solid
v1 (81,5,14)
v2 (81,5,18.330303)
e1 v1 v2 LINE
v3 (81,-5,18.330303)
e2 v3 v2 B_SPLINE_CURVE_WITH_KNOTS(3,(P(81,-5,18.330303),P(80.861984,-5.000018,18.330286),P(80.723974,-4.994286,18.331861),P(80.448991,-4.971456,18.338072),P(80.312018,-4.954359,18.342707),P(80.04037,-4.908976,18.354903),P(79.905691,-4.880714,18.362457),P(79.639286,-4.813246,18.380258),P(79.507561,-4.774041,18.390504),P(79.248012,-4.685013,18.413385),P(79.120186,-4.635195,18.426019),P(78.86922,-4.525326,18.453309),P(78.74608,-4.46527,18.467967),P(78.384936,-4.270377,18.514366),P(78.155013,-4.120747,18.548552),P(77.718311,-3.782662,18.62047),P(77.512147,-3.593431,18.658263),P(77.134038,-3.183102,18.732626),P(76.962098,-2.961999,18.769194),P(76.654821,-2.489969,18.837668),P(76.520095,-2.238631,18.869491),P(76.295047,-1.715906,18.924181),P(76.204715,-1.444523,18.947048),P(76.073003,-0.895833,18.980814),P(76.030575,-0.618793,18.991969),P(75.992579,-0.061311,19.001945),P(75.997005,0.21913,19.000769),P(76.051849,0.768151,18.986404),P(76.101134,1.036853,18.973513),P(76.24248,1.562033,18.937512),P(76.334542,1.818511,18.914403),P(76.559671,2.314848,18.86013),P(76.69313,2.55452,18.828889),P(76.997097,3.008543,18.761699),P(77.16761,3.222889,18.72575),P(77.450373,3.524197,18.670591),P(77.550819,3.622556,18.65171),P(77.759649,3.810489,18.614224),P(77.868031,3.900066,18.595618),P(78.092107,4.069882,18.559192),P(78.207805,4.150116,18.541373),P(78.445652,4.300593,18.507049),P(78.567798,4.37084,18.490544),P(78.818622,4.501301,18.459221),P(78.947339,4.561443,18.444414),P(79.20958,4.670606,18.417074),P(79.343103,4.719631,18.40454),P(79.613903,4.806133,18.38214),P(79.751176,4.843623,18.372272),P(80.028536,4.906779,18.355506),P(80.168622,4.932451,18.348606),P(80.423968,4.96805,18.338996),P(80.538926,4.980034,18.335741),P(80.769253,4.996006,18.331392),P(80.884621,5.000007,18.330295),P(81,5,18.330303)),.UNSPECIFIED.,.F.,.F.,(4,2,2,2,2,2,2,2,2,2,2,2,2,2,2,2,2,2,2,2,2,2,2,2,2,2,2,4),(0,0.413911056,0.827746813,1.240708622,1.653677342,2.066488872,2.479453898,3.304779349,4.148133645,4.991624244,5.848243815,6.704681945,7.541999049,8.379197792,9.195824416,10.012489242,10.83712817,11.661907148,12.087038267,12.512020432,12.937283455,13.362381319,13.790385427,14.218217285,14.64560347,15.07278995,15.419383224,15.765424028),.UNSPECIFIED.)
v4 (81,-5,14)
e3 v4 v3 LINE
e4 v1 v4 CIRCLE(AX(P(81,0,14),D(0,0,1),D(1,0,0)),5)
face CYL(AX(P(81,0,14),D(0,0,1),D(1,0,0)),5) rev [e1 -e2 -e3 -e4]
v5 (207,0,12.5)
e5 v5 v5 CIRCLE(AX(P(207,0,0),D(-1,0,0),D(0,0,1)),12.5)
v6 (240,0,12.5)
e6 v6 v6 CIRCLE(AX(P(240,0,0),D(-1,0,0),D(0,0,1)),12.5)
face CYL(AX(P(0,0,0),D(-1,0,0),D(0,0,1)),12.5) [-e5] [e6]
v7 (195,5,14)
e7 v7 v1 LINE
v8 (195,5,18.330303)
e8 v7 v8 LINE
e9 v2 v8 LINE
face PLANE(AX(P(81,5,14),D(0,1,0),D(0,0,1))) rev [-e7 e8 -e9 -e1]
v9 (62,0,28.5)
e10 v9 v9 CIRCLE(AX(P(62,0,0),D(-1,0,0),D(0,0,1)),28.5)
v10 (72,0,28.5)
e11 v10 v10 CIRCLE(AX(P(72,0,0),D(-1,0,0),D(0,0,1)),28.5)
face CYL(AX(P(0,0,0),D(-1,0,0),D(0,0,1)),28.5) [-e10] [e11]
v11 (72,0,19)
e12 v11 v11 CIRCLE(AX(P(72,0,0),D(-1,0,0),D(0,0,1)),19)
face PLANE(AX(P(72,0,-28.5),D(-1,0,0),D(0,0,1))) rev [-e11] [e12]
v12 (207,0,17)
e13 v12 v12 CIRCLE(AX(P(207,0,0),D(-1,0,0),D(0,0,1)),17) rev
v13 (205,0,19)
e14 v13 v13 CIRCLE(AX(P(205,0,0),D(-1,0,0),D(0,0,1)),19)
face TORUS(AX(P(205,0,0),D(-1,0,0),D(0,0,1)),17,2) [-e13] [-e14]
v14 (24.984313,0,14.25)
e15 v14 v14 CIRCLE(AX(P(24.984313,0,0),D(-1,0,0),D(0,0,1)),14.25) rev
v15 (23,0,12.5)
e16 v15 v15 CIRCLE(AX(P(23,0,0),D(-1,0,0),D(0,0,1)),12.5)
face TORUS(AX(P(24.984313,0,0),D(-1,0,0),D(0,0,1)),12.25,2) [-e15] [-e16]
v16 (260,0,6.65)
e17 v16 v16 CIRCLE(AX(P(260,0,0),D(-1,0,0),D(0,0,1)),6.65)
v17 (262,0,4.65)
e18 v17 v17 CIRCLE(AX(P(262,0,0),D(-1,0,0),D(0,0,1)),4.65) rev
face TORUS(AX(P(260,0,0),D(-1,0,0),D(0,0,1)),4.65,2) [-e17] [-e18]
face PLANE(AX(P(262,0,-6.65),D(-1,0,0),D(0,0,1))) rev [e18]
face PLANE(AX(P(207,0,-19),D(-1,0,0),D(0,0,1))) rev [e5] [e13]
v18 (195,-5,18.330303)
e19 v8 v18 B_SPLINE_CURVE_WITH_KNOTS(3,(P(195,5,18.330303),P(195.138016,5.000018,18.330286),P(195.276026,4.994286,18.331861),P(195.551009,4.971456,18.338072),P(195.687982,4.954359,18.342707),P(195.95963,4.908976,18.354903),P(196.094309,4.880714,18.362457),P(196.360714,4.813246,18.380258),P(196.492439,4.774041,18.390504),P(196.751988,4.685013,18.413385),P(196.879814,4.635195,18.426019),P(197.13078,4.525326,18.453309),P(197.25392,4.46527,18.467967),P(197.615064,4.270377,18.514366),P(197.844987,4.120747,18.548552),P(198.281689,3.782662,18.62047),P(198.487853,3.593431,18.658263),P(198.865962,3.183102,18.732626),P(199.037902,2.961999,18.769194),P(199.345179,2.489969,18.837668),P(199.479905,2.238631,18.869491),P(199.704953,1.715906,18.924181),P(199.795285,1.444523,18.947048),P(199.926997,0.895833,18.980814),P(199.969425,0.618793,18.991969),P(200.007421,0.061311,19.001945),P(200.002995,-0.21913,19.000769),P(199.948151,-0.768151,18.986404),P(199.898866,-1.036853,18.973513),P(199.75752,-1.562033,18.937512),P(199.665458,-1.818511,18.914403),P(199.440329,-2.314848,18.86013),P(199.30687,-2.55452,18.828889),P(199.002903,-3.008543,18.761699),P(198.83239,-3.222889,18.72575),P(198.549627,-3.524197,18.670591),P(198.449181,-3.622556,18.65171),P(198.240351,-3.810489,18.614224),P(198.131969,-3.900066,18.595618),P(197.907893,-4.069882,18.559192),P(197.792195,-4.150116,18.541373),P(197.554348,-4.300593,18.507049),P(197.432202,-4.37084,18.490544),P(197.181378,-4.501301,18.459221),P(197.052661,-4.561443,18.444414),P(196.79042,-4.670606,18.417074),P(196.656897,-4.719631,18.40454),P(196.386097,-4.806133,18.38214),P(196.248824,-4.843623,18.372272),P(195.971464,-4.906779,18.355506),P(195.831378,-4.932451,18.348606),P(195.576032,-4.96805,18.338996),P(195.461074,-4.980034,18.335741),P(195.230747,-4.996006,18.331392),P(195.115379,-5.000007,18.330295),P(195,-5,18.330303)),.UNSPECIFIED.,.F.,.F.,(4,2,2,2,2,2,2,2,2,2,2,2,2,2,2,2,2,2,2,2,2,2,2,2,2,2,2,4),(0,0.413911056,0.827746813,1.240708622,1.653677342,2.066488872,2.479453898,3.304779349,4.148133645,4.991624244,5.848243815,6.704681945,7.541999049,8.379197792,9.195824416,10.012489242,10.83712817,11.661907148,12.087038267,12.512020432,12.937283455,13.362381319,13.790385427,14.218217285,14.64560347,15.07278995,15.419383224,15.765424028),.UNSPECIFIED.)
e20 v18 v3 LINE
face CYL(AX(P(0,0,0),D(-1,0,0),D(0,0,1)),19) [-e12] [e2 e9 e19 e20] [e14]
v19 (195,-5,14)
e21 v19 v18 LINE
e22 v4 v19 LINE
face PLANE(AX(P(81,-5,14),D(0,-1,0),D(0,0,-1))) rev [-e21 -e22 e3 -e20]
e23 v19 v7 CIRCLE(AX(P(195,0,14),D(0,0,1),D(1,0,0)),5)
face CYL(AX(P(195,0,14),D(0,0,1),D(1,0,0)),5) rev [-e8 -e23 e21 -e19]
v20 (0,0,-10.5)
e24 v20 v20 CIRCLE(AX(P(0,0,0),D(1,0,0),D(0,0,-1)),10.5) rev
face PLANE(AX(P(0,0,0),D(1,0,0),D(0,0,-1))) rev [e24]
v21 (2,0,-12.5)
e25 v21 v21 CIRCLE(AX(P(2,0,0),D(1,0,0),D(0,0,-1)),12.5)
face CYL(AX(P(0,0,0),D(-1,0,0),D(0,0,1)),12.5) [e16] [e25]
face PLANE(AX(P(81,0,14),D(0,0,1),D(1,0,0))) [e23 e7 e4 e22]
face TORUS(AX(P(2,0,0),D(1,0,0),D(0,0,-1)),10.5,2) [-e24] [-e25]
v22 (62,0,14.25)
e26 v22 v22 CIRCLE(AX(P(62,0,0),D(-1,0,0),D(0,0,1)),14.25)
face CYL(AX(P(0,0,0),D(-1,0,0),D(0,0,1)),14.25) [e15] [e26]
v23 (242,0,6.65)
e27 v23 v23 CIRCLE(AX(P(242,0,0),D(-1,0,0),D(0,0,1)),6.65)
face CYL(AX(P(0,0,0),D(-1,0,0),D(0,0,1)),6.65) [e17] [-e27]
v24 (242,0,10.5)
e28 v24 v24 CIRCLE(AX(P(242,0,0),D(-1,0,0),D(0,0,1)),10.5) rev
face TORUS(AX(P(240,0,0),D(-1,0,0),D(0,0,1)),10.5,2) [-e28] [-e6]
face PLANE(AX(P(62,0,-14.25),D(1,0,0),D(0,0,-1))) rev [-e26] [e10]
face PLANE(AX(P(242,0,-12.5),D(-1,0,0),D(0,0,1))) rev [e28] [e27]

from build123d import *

# Parameters (mm, degrees)
FILLET_1_R          = 2
CUT_EXTRUDE_1_DEPTH = 5


with BuildPart() as part:
    # Эскиз1 → Повернуть1 (revolve)
    with BuildSketch(Plane(origin=(0, 0, 0), x_dir=(1, 0, 0), z_dir=(0, 1, 0)), mode=Mode.PRIVATE) as revolve_1_sk:
        Polygon((0, 0), (0, 12.5), (23, 12.5), (23, 14.25), (62, 14.25), (62, 28.5), (72, 28.5), (72, 19), (207, 19), (207, 12.5), (242, 12.5), (242, 6.65), (262, 6.65), (262, 0), align=None)
    revolve(revolve_1_sk.sketch.rotate(Axis((0, 0, 0), (1, 0, 0)), 180), axis=Axis((0, 0, 0), (1, 0, 0)))

    # Скругление1
    # the kernel refuses this fillet: 2 mm, written as the material it takes off along each edge
    with BuildSketch(Plane(origin=(262, 0, 0), x_dir=(0, 0, 1), z_dir=(0, 1, 0))) as fillet_1_piece_1:
        with BuildLine():
            CenterArc((6.65 - FILLET_1_R, -FILLET_1_R), FILLET_1_R, 0, 90)
            Line((6.65 - FILLET_1_R, 0), (6.65 - FILLET_1_R, FILLET_1_R * 0.02))
            Line((6.65 - FILLET_1_R, FILLET_1_R * 0.02), (6.65 + FILLET_1_R * 0.02, FILLET_1_R * 0.02))
            Line((6.65 + FILLET_1_R * 0.02, FILLET_1_R * 0.02), (6.65 + FILLET_1_R * 0.02, -FILLET_1_R))
            Line((6.65 + FILLET_1_R * 0.02, -FILLET_1_R), (6.65, -FILLET_1_R))
        make_face()
    revolve(axis=Axis((262, 0, 0), (1, 0, 0)), mode=Mode.SUBTRACT)
    with BuildSketch(Plane(origin=(242, 0, 0), x_dir=(0, 0, 1), z_dir=(0, 1, 0))) as fillet_1_piece_2:
        with BuildLine():
            CenterArc((12.5 - FILLET_1_R, -FILLET_1_R), FILLET_1_R, 0, 90)
            Line((12.5 - FILLET_1_R, 0), (12.5 - FILLET_1_R, FILLET_1_R * 0.02))
            Line((12.5 - FILLET_1_R, FILLET_1_R * 0.02), (12.5 + FILLET_1_R * 0.02, FILLET_1_R * 0.02))
            Line((12.5 + FILLET_1_R * 0.02, FILLET_1_R * 0.02), (12.5 + FILLET_1_R * 0.02, -FILLET_1_R))
            Line((12.5 + FILLET_1_R * 0.02, -FILLET_1_R), (12.5, -FILLET_1_R))
        make_face()
    revolve(axis=Axis((242, 0, 0), (1, 0, 0)), mode=Mode.SUBTRACT)
    with BuildSketch(Plane(origin=(207, 0, 0), x_dir=(0, 0, 1), z_dir=(0, 1, 0))) as fillet_1_piece_3:
        with BuildLine():
            CenterArc((19 - FILLET_1_R, -FILLET_1_R), FILLET_1_R, 0, 90)
            Line((19 - FILLET_1_R, 0), (19 - FILLET_1_R, FILLET_1_R * 0.02))
            Line((19 - FILLET_1_R, FILLET_1_R * 0.02), (19 + FILLET_1_R * 0.02, FILLET_1_R * 0.02))
            Line((19 + FILLET_1_R * 0.02, FILLET_1_R * 0.02), (19 + FILLET_1_R * 0.02, -FILLET_1_R))
            Line((19 + FILLET_1_R * 0.02, -FILLET_1_R), (19, -FILLET_1_R))
        make_face()
    revolve(axis=Axis((207, 0, 0), (1, 0, 0)), mode=Mode.SUBTRACT)
    with BuildSketch(Plane(origin=(23, 0, 0), x_dir=(0, 0, 1), z_dir=(0, 1, 0))) as fillet_1_piece_4:
        with BuildLine():
            CenterArc((12.25, 1.984313483), FILLET_1_R, 277.180755781, 82.819244219)
            Line((14.25, 1.984313483), (14.29, 1.984313483))
            Line((14.29, 1.984313483), (14.29, 0))
            Line((14.29, 0), (14.25, -0.04))
            ThreePointArc((14.25, -0.04), (13.375, -0.04), (12.505, -0.03968627))
            Line((12.505, -0.03968627), (12.5, 0))
        make_face()
    revolve(axis=Axis((23, 0, 0), (1, 0, 0)), mode=Mode.SUBTRACT)
    with BuildSketch(Plane(origin=(0, 0, 0), x_dir=(0, 0, 1), z_dir=(0, 1, 0))) as fillet_1_piece_5:
        with BuildLine():
            CenterArc((12.5 - FILLET_1_R, FILLET_1_R), FILLET_1_R, 270, 90)
            Line((12.5, FILLET_1_R), (12.5 + FILLET_1_R * 0.02, FILLET_1_R))
            Line((12.5 + FILLET_1_R * 0.02, FILLET_1_R), (12.5 + FILLET_1_R * 0.02, -FILLET_1_R * 0.02))
            Line((12.5 + FILLET_1_R * 0.02, -FILLET_1_R * 0.02), (12.5 - FILLET_1_R, -FILLET_1_R * 0.02))
            Line((12.5 - FILLET_1_R, -FILLET_1_R * 0.02), (12.5 - FILLET_1_R, 0))
        make_face()
    revolve(axis=Axis((0, 0, 0), (1, 0, 0)), mode=Mode.SUBTRACT)

    # Эскиз2 → Вырез-Вытянуть1 (cut)
    with BuildSketch(Plane.XY.offset(19)):
        with BuildLine():
            Line((81, 5), (195, 5))
            ThreePointArc((195, 5), (200, 0), (195, -5))
            Line((195, -5), (81, -5))
            ThreePointArc((81, -5), (76, 0), (81, 5))
        make_face()
    extrude(amount=-CUT_EXTRUDE_1_DEPTH, mode=Mode.SUBTRACT)


solid = part.part
